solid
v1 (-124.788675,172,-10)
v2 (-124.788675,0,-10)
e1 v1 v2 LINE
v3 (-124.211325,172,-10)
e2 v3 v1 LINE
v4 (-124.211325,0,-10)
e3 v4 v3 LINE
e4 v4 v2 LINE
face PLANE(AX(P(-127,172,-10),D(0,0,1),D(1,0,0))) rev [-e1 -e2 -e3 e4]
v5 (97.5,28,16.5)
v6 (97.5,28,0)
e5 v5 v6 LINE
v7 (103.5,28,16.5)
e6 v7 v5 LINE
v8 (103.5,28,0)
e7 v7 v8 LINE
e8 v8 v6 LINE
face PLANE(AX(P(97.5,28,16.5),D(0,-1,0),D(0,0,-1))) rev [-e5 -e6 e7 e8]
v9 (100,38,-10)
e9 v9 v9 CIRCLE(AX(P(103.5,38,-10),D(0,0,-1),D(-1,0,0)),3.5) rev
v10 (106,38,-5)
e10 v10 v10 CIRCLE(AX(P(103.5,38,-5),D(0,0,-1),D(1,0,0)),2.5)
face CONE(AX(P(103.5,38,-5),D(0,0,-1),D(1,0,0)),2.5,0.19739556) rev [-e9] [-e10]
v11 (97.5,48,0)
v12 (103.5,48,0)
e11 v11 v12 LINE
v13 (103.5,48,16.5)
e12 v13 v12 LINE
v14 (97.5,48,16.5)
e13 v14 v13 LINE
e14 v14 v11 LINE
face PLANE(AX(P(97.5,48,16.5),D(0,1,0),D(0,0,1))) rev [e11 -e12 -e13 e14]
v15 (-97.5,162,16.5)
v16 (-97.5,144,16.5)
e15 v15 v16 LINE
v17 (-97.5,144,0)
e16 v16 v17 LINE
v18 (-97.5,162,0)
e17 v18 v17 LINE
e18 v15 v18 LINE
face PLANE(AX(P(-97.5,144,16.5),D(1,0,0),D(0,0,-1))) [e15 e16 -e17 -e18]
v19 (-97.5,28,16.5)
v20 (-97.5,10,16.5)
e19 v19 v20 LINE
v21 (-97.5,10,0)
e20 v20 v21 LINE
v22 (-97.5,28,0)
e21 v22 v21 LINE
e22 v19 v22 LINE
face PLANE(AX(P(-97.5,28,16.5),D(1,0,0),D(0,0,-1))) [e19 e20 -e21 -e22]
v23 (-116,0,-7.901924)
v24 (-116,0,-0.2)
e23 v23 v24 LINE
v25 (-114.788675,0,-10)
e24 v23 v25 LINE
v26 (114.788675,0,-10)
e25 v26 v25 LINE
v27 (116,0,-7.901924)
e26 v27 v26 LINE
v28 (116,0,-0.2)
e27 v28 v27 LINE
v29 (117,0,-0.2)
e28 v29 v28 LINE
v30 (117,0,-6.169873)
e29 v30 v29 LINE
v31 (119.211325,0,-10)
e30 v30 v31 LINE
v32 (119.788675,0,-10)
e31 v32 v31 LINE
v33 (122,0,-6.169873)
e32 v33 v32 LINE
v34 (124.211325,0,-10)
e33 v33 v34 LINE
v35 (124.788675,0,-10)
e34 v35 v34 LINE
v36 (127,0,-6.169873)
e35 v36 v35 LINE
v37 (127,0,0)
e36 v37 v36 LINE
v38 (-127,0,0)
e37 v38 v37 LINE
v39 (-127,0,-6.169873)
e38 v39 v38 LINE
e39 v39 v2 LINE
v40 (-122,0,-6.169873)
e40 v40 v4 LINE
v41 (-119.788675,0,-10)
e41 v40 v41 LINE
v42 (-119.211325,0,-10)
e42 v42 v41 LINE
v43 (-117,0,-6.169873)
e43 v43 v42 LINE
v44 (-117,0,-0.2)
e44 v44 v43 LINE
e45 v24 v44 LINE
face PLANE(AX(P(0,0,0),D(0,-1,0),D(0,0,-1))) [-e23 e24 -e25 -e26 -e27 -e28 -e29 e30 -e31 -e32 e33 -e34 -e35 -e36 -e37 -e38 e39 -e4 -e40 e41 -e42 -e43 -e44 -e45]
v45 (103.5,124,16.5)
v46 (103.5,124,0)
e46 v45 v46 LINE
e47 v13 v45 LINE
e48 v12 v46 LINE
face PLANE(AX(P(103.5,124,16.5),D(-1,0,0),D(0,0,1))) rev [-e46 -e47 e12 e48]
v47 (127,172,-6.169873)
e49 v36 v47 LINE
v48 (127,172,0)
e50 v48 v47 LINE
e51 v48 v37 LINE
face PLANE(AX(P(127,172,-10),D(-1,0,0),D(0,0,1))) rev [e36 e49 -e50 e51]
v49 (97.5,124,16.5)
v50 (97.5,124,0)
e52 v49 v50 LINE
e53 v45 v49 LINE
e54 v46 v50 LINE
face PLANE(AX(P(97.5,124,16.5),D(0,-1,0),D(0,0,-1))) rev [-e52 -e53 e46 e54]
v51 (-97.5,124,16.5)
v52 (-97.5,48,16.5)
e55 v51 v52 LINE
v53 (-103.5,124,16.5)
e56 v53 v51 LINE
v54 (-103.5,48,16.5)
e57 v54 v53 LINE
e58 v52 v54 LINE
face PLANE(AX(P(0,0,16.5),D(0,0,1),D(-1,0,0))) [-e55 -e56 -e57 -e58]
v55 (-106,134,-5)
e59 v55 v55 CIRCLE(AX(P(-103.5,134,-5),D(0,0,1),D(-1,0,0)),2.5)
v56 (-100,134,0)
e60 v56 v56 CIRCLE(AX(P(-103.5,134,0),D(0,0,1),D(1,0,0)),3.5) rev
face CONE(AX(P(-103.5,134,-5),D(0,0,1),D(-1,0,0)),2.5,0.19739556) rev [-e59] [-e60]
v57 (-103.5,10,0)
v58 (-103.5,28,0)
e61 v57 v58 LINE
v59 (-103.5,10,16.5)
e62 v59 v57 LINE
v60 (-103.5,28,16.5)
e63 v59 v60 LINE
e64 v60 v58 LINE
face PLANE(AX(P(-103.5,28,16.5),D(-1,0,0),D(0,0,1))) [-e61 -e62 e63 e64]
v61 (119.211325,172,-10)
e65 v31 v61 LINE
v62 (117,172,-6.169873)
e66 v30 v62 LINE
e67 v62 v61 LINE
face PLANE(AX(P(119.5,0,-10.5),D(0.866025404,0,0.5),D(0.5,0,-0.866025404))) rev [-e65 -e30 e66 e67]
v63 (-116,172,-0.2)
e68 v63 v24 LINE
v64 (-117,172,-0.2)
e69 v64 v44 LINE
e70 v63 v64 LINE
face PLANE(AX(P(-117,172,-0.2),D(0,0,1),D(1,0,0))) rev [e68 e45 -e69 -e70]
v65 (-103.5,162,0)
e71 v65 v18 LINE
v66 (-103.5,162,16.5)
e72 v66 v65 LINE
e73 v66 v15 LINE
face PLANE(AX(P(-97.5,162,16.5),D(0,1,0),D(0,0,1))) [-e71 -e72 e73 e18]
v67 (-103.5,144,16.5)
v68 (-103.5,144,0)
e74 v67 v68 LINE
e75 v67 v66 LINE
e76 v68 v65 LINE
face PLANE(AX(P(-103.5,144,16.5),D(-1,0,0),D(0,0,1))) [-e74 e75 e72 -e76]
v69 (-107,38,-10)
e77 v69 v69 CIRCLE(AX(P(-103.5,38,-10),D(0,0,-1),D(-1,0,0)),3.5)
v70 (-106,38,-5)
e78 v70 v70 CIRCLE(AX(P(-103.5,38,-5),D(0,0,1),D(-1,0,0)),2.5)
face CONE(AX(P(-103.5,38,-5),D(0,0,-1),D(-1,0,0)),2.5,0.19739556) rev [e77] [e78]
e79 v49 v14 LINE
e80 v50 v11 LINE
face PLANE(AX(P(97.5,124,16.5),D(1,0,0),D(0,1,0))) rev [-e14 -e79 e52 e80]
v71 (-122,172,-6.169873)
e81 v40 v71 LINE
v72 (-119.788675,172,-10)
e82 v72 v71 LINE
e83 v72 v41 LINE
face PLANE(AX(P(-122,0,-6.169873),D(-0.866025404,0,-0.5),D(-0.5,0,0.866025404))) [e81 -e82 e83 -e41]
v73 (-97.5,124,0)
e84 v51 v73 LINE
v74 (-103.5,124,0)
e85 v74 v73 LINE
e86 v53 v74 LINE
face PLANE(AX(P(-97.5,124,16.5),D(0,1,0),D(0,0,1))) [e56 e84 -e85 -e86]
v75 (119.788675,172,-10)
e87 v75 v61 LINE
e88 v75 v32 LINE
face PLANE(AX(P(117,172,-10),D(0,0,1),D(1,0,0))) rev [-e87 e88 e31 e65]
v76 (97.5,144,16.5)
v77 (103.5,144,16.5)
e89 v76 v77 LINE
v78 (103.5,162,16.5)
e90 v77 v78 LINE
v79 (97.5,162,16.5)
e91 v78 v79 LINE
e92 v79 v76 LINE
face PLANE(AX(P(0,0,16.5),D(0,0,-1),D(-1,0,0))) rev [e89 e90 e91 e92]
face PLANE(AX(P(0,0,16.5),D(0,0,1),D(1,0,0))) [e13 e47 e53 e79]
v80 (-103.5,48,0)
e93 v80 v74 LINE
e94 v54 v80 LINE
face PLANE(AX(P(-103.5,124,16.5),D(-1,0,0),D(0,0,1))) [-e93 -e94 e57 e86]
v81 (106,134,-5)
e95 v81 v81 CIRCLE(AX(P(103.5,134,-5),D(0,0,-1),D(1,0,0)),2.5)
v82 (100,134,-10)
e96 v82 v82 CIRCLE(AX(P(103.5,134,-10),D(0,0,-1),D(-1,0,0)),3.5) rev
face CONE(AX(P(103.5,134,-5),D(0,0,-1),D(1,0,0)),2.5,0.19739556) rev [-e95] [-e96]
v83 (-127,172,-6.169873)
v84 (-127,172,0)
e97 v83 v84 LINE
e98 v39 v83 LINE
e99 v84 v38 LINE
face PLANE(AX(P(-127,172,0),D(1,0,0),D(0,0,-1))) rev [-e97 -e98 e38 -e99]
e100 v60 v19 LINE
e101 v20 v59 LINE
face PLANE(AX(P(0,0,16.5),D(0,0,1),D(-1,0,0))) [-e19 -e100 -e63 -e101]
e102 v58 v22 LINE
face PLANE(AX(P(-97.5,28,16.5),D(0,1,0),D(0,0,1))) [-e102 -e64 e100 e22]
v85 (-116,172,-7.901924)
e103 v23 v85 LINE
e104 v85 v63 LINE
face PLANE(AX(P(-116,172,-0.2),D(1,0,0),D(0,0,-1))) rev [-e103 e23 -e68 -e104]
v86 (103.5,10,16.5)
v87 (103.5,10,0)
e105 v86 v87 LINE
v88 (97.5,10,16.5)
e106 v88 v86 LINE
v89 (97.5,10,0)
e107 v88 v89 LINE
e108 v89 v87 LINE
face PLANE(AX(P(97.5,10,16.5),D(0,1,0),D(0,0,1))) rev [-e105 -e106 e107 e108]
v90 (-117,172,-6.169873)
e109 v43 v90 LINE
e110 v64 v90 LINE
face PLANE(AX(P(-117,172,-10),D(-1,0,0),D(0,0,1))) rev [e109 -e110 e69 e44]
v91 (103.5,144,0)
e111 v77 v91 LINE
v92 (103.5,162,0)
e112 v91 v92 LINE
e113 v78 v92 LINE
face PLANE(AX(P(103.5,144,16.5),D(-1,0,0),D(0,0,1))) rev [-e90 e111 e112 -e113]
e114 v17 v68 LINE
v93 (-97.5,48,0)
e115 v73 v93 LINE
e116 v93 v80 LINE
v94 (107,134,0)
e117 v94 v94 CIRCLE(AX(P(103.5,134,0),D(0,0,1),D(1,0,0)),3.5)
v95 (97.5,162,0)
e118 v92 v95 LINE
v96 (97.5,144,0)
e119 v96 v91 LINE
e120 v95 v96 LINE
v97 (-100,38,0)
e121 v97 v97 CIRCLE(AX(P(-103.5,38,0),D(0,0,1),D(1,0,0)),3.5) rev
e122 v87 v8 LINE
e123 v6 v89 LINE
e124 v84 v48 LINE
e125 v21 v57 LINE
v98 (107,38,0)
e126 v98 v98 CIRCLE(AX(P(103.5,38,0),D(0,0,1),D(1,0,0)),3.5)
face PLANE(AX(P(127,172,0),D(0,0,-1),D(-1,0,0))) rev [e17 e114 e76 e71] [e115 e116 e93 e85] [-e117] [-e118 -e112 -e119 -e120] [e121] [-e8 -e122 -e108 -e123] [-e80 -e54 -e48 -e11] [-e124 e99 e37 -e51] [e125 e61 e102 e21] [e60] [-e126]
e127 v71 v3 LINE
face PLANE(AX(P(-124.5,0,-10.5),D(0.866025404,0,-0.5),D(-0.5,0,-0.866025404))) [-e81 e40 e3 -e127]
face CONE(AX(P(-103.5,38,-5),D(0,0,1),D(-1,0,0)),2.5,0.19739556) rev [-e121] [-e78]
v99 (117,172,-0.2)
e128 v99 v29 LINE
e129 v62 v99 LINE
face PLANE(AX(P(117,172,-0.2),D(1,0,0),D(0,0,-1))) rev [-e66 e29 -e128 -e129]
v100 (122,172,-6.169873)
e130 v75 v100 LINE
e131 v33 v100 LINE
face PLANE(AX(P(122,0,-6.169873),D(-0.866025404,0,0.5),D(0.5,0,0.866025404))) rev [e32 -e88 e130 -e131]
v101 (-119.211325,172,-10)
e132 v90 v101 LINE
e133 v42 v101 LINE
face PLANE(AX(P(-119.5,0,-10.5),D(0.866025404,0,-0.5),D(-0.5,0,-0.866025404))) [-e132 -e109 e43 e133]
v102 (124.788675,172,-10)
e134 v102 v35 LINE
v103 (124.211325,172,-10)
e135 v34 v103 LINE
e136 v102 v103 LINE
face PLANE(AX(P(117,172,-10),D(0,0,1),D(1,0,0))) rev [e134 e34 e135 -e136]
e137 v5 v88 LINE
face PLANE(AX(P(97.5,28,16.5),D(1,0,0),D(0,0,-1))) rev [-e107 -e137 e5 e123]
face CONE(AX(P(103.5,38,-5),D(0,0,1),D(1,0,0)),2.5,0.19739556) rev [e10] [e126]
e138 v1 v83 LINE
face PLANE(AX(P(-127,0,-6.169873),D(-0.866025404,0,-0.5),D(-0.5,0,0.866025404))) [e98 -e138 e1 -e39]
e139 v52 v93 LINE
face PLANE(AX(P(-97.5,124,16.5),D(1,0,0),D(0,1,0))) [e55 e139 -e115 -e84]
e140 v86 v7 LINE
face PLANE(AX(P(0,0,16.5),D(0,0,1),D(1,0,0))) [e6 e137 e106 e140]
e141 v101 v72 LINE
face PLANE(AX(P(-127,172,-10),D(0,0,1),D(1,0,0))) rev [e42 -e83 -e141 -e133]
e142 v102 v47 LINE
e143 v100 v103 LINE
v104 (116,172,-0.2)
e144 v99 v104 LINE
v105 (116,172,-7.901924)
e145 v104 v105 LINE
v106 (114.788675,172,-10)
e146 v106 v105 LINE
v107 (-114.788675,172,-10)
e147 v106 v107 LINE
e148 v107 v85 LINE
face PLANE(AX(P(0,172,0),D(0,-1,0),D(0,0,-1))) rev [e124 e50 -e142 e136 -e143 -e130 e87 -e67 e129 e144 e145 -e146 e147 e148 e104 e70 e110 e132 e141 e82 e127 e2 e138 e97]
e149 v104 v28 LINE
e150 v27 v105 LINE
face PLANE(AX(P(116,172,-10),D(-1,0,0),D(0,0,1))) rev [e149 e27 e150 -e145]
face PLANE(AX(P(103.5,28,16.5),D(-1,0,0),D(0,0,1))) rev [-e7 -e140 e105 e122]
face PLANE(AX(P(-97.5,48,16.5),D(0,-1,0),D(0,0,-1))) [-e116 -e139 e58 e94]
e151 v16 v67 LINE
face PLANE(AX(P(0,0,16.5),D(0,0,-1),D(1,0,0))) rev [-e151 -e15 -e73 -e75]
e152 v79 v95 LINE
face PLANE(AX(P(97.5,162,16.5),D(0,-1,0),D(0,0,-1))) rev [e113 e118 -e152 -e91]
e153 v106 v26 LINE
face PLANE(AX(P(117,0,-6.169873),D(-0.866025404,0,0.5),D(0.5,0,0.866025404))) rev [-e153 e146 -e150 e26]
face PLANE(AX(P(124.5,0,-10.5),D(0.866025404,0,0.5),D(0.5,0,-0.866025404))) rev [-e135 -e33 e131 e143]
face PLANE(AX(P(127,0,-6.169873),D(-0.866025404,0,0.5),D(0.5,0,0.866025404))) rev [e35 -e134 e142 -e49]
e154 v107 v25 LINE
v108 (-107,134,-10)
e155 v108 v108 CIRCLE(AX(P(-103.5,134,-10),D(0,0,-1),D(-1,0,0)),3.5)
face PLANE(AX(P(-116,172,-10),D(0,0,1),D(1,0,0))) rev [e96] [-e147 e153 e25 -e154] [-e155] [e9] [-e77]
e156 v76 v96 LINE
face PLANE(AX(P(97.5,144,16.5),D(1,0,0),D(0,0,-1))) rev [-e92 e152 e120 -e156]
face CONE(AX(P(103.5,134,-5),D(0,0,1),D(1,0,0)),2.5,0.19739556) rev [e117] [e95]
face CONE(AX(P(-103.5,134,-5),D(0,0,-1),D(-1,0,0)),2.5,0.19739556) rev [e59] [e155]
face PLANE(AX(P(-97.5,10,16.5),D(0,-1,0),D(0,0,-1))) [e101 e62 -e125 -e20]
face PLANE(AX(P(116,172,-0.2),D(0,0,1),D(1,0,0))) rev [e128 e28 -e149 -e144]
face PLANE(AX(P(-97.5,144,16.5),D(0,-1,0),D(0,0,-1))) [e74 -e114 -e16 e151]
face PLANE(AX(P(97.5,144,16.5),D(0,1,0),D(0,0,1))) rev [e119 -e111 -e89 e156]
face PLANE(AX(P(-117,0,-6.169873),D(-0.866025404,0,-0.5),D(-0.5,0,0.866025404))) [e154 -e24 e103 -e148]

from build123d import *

# Parameters (mm, degrees)
MAIN_BODY_DEPTH     = 172
SKETCH2_R           = 3.5
SKETCH3_R           = 2.5
SKETCH2_3_R         = 3.5
SKETCH3_3_R         = 2.5
SKETCH4_W           = 6
SKETCH4_H           = 76
SKETCH4_H_2         = 18
BOSS_EXTRUDE1_DEPTH = 16.5
CUT_EXTRUDE1_DEPTH  = 215.441717024
LPATTERN1_DEPTH     = 172


# Read off the part's stored shape, not the designer's step: Mirror2, LPattern1
with BuildPart() as part:
    # Sketch1 → Main Body (new body)
    with BuildSketch(Plane(origin=(0, 0, 0), x_dir=(1, 0, 0), z_dir=(0, 1, 0))):
        Polygon((-127, 0), (-127, 10), (-117, 10), (-117, 0.2), (-116, 0.2), (-116, 10), (116, 10), (116, 0.2), (117, 0.2), (117, 10), (127, 10), (127, 0), align=None)
    extrude(amount=MAIN_BODY_DEPTH)

    # Sketch2 → Cut-Loft2 section 0
    with BuildSketch(Plane(origin=(0, 0, -10), x_dir=(-1, 0, 0), z_dir=(0, 0, -1))):
        with Locations((103.5, 134)):
            Circle(SKETCH2_R)
    # Sketch3 → Cut-Loft2 section 1
    with BuildSketch(Plane.XY.offset(-5)):
        with Locations((-103.5, 134)):
            Circle(SKETCH3_R)
    cut_loft2 = loft(mode=Mode.SUBTRACT)

    # Sketch2<3> → Cut-Loft3 section 0
    with BuildSketch(Plane(origin=(0, 0, -10), x_dir=(-1, 0, 0), z_dir=(0, 0, -1))):
        with Locations((103.5, 38)):
            Circle(SKETCH2_3_R)
    # Sketch3<3> → Cut-Loft3 section 1
    with BuildSketch(Plane.XY.offset(-5)):
        with Locations((-103.5, 38)):
            Circle(SKETCH3_3_R)
    cut_loft3 = loft(mode=Mode.SUBTRACT)

    # Mirror1: Cut-Loft2, Cut-Loft3 across plane
    add(cut_loft2.mirror(Plane.XY.offset(-5)), mode=Mode.SUBTRACT)
    add(cut_loft3.mirror(Plane.XY.offset(-5)), mode=Mode.SUBTRACT)

    # Mirror2 outline → Mirror2 (revolve, cut)
    with BuildSketch(Plane(origin=(103.5, 134, 0), x_dir=(1, 0, 0), z_dir=(0, -1, 0))):
        Polygon((3.5, -10), (2.5, -5), (3.5, 0), (0, 0), (0, -10), align=None)
    revolve(axis=Axis((103.5, 134, 0), (0, 0, 1)), mode=Mode.SUBTRACT)

    # Mirror2 2 outline → Mirror2 2 (revolve, cut)
    with BuildSketch(Plane(origin=(103.5, 38, 0), x_dir=(1, 0, 0), z_dir=(0, -1, 0))):
        Polygon((3.5, -10), (2.5, -5), (3.5, 0), (0, 0), (0, -10), align=None)
    revolve(axis=Axis((103.5, 38, 0), (0, 0, 1)), mode=Mode.SUBTRACT)

    # Sketch4 → Boss-Extrude1 (add)
    with BuildSketch(Plane.XY):
        with Locations((100.5, 86)):
            Rectangle(SKETCH4_W, SKETCH4_H)
        with Locations((100.5, 153)):
            Rectangle(SKETCH4_W, SKETCH4_H_2)
        with Locations((100.5, 19)):
            Rectangle(SKETCH4_W, SKETCH4_H_2)
    boss_extrude1 = extrude(amount=BOSS_EXTRUDE1_DEPTH)

    # Mirror3: Boss-Extrude1 across plane
    add(boss_extrude1.mirror(Plane(origin=(0, 0, 0), x_dir=(0, 0, 1), z_dir=(1, 0, 0))))

    # Sketch5 → Cut-Extrude1 (cut, through all)
    with BuildSketch(Plane(origin=(0, 172, 0), x_dir=(1, 0, 0), z_dir=(0, 1, 0))):
        Polygon((129.5, 10.5), (127, 6.169872981), (124.5, 10.5), align=None)
    cut_extrude1 = extrude(amount=-CUT_EXTRUDE1_DEPTH, mode=Mode.SUBTRACT)

    # LPattern1 outline → LPattern1 (cut)
    with BuildSketch(Plane(origin=(0, 0, 0), x_dir=(1, 0, 0), z_dir=(0, 1, 0))):
        Polygon((119.788675135, 10), (122, 6.169872981), (124.211324865, 10), align=None)
        Polygon((117, 6.169872981), (119.211324865, 10), (117, 10), align=None)
        Polygon((116, 10), (114.788675135, 10), (116, 7.901923789), align=None)
    lpattern1 = extrude(amount=LPATTERN1_DEPTH, mode=Mode.SUBTRACT)

    # Mirror4: Cut-Extrude1, LPattern1 across plane
    add(cut_extrude1.mirror(Plane(origin=(0, 0, 0), x_dir=(0, 0, 1), z_dir=(1, 0, 0))), mode=Mode.SUBTRACT)
    add(lpattern1.mirror(Plane(origin=(0, 0, 0), x_dir=(0, 0, 1), z_dir=(1, 0, 0))), mode=Mode.SUBTRACT)


solid = part.part
